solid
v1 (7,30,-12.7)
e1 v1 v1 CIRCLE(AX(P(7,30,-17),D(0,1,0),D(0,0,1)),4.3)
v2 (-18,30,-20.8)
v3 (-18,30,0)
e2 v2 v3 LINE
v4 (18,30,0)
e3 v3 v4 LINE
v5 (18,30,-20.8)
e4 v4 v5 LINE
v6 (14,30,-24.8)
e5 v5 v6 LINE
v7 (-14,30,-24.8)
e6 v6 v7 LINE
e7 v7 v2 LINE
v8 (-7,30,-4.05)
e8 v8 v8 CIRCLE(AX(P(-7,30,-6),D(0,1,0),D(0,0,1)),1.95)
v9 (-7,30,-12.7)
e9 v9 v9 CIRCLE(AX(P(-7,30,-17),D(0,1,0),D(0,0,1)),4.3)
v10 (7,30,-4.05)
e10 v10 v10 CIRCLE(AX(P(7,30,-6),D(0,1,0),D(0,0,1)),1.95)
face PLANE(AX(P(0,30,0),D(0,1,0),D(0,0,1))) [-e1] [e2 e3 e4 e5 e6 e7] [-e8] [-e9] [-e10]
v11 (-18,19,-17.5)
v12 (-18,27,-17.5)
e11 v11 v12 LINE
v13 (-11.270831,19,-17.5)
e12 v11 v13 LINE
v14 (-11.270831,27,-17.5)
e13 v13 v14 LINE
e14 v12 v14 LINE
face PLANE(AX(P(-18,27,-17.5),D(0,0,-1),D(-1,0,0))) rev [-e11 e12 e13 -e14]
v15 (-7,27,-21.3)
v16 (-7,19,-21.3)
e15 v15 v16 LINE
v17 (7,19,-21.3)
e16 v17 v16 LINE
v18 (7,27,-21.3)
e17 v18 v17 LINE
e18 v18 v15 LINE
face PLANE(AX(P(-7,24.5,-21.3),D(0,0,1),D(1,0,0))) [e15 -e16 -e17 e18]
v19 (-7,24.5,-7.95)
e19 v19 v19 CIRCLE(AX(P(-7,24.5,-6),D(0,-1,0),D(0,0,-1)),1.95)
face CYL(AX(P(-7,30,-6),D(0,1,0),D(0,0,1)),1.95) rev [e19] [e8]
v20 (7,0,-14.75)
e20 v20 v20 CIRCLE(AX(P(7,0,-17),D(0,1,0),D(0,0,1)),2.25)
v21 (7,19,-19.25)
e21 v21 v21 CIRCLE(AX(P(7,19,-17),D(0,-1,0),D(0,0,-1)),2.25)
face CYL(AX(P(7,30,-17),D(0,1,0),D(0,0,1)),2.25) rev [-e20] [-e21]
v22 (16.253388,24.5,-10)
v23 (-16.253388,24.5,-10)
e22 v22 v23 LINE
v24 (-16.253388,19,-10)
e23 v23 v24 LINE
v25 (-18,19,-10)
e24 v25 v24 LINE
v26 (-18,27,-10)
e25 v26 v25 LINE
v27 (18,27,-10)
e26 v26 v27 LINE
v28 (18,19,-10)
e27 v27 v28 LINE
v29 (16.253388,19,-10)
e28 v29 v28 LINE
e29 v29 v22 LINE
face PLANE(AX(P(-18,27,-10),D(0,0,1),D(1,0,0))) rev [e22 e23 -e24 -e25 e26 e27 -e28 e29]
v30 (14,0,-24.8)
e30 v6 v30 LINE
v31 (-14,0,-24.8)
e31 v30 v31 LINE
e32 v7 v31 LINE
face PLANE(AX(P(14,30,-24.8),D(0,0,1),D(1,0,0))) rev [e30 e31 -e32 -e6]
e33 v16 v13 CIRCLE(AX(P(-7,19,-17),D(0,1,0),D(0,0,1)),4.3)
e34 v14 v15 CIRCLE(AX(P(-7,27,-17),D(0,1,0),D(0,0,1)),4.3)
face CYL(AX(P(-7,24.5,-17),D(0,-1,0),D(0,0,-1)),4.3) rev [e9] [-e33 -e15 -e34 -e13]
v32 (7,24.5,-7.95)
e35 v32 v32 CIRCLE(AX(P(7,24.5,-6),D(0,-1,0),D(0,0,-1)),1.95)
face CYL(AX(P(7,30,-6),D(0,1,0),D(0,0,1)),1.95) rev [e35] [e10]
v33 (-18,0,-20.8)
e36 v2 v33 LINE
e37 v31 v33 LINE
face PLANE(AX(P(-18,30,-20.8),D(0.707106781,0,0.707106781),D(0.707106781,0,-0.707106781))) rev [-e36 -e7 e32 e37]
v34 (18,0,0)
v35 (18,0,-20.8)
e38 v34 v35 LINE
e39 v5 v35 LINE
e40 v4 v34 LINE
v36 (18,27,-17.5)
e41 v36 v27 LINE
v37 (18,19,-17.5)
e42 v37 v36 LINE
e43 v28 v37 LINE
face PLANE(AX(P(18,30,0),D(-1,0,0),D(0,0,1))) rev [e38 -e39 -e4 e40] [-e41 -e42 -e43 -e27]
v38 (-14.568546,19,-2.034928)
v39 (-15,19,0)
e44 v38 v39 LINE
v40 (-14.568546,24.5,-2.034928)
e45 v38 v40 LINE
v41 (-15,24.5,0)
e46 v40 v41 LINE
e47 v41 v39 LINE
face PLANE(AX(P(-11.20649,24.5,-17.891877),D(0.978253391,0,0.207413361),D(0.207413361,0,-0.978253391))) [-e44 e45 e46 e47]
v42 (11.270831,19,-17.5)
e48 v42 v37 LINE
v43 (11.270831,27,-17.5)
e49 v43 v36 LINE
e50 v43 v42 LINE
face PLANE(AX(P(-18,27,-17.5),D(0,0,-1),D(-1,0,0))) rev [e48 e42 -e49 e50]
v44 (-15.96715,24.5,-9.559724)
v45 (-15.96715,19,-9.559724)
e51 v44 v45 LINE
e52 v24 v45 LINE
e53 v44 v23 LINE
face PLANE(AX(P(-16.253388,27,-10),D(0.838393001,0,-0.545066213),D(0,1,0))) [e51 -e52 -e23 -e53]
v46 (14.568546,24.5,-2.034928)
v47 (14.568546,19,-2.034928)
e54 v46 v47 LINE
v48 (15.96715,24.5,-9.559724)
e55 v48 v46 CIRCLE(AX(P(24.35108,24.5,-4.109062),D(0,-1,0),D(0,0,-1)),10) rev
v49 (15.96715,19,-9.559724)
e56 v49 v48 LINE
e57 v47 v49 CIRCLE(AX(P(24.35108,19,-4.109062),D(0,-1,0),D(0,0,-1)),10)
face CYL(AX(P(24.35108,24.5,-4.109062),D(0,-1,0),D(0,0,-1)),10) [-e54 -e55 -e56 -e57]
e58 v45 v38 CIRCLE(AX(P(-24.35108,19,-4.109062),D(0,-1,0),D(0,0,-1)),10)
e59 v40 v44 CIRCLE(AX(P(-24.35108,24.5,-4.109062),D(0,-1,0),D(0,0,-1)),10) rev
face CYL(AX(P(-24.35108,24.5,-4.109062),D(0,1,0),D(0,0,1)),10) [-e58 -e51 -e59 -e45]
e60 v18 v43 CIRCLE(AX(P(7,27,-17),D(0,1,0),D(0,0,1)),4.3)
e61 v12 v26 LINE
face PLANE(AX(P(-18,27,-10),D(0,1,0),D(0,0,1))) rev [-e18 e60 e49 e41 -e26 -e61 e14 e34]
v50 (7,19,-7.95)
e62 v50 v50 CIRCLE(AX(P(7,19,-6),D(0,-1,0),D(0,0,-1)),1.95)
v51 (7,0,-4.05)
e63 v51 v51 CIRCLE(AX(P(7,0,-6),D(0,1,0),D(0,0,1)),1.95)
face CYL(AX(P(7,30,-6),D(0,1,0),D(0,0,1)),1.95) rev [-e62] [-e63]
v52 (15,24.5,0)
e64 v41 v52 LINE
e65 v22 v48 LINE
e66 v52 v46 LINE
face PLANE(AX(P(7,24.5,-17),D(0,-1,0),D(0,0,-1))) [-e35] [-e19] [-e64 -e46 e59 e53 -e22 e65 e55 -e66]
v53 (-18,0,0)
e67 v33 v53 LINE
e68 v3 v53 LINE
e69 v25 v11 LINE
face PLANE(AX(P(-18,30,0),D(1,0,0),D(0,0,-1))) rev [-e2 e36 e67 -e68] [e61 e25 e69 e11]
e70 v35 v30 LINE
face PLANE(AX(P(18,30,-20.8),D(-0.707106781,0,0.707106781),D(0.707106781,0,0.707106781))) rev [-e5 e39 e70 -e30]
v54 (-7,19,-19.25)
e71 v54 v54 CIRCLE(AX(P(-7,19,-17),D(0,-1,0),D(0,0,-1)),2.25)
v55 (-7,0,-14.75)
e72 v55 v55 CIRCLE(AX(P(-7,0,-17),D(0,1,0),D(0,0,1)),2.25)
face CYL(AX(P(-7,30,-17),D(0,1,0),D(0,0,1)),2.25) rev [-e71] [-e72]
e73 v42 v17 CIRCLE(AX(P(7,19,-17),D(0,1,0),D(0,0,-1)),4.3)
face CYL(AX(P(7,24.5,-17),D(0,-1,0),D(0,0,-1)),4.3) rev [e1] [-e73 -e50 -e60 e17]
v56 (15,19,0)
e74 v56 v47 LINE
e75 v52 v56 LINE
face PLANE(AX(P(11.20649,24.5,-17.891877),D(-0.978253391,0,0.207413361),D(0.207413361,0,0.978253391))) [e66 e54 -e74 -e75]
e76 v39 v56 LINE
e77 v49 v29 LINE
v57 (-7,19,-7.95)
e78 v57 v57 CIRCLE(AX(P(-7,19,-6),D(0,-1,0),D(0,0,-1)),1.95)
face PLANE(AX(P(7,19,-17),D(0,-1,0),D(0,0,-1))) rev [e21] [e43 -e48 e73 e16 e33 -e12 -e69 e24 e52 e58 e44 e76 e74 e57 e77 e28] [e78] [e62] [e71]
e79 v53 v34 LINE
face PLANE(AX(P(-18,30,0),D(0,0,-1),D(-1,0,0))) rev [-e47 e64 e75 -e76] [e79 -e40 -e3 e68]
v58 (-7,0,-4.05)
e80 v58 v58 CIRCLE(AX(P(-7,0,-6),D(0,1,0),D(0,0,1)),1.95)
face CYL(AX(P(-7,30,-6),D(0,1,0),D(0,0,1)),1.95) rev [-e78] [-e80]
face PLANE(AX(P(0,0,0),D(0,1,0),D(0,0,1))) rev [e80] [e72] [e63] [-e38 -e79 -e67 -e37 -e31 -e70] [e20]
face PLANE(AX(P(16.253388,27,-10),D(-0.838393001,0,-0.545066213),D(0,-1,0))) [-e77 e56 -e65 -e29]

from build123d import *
from OCP.BRepFilletAPI import BRepFilletAPI_MakeChamfer

# Parameters (mm, degrees)
BOSS_EXTRUDE1_DEPTH             = 30
CUT_EXTRUDE2_DEPTH              = 5.5
CBORE_FOR_M4_SBHCS1_D           = 4.5
CBORE_FOR_M4_SBHCS1_CBORE_D     = 8.6
CBORE_FOR_M4_SBHCS1_CBORE_DEPTH = 8
F_3_9_3_9_DIAMETER_HOLE1_D      = 3.9
CUT_EXTRUDE3_DEPTH              = 43.884029661
CUT_EXTRUDE3_DEPTH_BACK         = 43.884029661
SKETCH9_W                       = 7.5
SKETCH9_H                       = 8
CHAMFER1_SIZE                   = 4
CHAMFER1_SIZE2                  = 3.37362922
DELETEFACE1_START               = 24.5
DELETEFACE1_DEPTH               = 2.5
DELETEFACE2_START               = 19
DELETEFACE2_DEPTH               = 5.5
FILLET1_R                       = 10


# Read off the part's stored shape, not the designer's step: DeleteFace1, DeleteFace2
with BuildPart() as part:
    # Sketch1 → Boss-Extrude1 (new body)
    with BuildSketch(Plane(origin=(0, 0, 0), x_dir=(1, 0, 0), z_dir=(0, 1, 0))):
        Polygon((-18, 0), (18, 0), (18, 20.8), (14, 24.8), (-14, 24.8), (-18, 20.8), align=None)
    extrude(amount=BOSS_EXTRUDE1_DEPTH)

    # Sketch7 → Cut-Extrude2 (cut)
    with BuildSketch(Plane(origin=(0, 19, 0), x_dir=(1, 0, 0), z_dir=(0, 1, 0))):
        with BuildLine():
            Line((-7, 21.3), (7, 21.3))
            ThreePointArc((7, 21.3), (9.706928791, 20.34103824), (11.206489583, 17.891877451))
            Line((11.206489583, 17.891877451), (15, 0))
            Line((15, 0), (-15, 0))
            Line((-15, 0), (-11.206489583, 17.891877451))
            ThreePointArc((-11.206489583, 17.891877451), (-9.706928791, 20.34103824), (-7, 21.3))
        make_face()
    extrude(amount=CUT_EXTRUDE2_DEPTH, mode=Mode.SUBTRACT)

    # CBORE for M4 SBHCS1 (through all)
    with Locations(Plane(origin=(0, 30, 0), x_dir=(1, 0, 0), z_dir=(0, 1, 0))):
        with Locations((-7, 17), (7, 17)):
            CounterBoreHole(CBORE_FOR_M4_SBHCS1_D / 2, CBORE_FOR_M4_SBHCS1_CBORE_D / 2, CBORE_FOR_M4_SBHCS1_CBORE_DEPTH)

    # Ø3.9 (3.9) Diameter Hole1 (through all)
    with Locations(Plane(origin=(0, 30, 0), x_dir=(1, 0, 0), z_dir=(0, 1, 0))):
        with Locations((-7, 6), (7, 6)):
            Hole(F_3_9_3_9_DIAMETER_HOLE1_D / 2)

    # Sketch9 → Cut-Extrude3 (cut, two sides: drawn at the far end of the back side and taken through both)
    with BuildSketch(Plane(origin=(0, 0, 0), x_dir=(0, 0, -1), z_dir=(1, 0, 0)).offset(-CUT_EXTRUDE3_DEPTH_BACK)):
        with Locations((13.75, 23)):
            Rectangle(SKETCH9_W, SKETCH9_H)
    extrude(amount=CUT_EXTRUDE3_DEPTH + CUT_EXTRUDE3_DEPTH_BACK, mode=Mode.SUBTRACT)

    # Chamfer1: one chamfer whose edges measure the first distance from different faces: ONE call of the kernel's chamfer builder (chamfer() names one face for all edges)
    chamfer1_edges_1 = [part.edges().sort_by_distance(p)[0] for p in [
        (-12.879758328, 21.75, -10),
    ]]
    chamfer1_side_1 = [part.faces().sort_by_distance(p)[0] for p in [
        (-13.939879164, 21.75, -5),
    ]]
    chamfer1_edges_2 = [part.edges().sort_by_distance(p)[0] for p in [
        (12.879758328, 21.75, -10),
    ]]
    chamfer1_side_2 = [part.faces().sort_by_distance(p)[0] for p in [
        (13.939879164, 21.75, -5),
    ]]
    chamfer1 = BRepFilletAPI_MakeChamfer(part.part.solid().wrapped)
    for e in chamfer1_edges_1:
        chamfer1.Add(CHAMFER1_SIZE, CHAMFER1_SIZE2, e.wrapped, chamfer1_side_1[0].wrapped)  # the first distance lies on this face
    for e in chamfer1_edges_2:
        chamfer1.Add(CHAMFER1_SIZE, CHAMFER1_SIZE2, e.wrapped, chamfer1_side_2[0].wrapped)  # the first distance lies on this face
    add(Compound.cast(chamfer1.Shape()), mode=Mode.REPLACE)

    # DeleteFace1 outline → DeleteFace1 (cut)
    with BuildSketch(Plane(origin=(0, 0, 0), x_dir=(1, 0, 0), z_dir=(0, 1, 0)).offset(DELETEFACE1_START)):
        with BuildLine():
            Line((7, 21.3), (-7, 21.3))
            ThreePointArc((-7, 21.3), (-4.141678814, 20.212475681), (-2.729168699, 17.5))
            Line((-2.729168699, 17.5), (2.729168699, 17.5))
            ThreePointArc((2.729168699, 17.5), (4.141678814, 20.212475681), (7, 21.3))
        make_face()
    extrude(amount=DELETEFACE1_DEPTH, mode=Mode.SUBTRACT)

    # DeleteFace2 outline → DeleteFace2 (add)
    with BuildSketch(Plane(origin=(0, 0, 0), x_dir=(1, 0, 0), z_dir=(0, 1, 0)).offset(DELETEFACE2_START)):
        with BuildLine():
            Line((-11.206489583, 17.891877451), (-11.289577073, 17.5))
            Line((-11.289577073, 17.5), (-11.270831301, 17.5))
            ThreePointArc((-11.270831301, 17.5), (-11.243186813, 17.696681903), (-11.206489583, 17.891877451))
        make_face()
        with BuildLine():
            Line((11.289577073, 17.5), (11.206489583, 17.891877451))
            ThreePointArc((11.206489583, 17.891877451), (11.243186813, 17.696681903), (11.270831301, 17.5))
            Line((11.270831301, 17.5), (11.289577073, 17.5))
        make_face()
    extrude(amount=DELETEFACE2_DEPTH)

    # Fillet1
    fillet1_edges = [part.edges().sort_by_distance(p)[0] for p in [
        (-13.70941177, 21.75, -6.086986434),
        (13.70941177, 21.75, -6.086986434),
    ]]
    fillet(fillet1_edges, radius=FILLET1_R)


solid = part.part
